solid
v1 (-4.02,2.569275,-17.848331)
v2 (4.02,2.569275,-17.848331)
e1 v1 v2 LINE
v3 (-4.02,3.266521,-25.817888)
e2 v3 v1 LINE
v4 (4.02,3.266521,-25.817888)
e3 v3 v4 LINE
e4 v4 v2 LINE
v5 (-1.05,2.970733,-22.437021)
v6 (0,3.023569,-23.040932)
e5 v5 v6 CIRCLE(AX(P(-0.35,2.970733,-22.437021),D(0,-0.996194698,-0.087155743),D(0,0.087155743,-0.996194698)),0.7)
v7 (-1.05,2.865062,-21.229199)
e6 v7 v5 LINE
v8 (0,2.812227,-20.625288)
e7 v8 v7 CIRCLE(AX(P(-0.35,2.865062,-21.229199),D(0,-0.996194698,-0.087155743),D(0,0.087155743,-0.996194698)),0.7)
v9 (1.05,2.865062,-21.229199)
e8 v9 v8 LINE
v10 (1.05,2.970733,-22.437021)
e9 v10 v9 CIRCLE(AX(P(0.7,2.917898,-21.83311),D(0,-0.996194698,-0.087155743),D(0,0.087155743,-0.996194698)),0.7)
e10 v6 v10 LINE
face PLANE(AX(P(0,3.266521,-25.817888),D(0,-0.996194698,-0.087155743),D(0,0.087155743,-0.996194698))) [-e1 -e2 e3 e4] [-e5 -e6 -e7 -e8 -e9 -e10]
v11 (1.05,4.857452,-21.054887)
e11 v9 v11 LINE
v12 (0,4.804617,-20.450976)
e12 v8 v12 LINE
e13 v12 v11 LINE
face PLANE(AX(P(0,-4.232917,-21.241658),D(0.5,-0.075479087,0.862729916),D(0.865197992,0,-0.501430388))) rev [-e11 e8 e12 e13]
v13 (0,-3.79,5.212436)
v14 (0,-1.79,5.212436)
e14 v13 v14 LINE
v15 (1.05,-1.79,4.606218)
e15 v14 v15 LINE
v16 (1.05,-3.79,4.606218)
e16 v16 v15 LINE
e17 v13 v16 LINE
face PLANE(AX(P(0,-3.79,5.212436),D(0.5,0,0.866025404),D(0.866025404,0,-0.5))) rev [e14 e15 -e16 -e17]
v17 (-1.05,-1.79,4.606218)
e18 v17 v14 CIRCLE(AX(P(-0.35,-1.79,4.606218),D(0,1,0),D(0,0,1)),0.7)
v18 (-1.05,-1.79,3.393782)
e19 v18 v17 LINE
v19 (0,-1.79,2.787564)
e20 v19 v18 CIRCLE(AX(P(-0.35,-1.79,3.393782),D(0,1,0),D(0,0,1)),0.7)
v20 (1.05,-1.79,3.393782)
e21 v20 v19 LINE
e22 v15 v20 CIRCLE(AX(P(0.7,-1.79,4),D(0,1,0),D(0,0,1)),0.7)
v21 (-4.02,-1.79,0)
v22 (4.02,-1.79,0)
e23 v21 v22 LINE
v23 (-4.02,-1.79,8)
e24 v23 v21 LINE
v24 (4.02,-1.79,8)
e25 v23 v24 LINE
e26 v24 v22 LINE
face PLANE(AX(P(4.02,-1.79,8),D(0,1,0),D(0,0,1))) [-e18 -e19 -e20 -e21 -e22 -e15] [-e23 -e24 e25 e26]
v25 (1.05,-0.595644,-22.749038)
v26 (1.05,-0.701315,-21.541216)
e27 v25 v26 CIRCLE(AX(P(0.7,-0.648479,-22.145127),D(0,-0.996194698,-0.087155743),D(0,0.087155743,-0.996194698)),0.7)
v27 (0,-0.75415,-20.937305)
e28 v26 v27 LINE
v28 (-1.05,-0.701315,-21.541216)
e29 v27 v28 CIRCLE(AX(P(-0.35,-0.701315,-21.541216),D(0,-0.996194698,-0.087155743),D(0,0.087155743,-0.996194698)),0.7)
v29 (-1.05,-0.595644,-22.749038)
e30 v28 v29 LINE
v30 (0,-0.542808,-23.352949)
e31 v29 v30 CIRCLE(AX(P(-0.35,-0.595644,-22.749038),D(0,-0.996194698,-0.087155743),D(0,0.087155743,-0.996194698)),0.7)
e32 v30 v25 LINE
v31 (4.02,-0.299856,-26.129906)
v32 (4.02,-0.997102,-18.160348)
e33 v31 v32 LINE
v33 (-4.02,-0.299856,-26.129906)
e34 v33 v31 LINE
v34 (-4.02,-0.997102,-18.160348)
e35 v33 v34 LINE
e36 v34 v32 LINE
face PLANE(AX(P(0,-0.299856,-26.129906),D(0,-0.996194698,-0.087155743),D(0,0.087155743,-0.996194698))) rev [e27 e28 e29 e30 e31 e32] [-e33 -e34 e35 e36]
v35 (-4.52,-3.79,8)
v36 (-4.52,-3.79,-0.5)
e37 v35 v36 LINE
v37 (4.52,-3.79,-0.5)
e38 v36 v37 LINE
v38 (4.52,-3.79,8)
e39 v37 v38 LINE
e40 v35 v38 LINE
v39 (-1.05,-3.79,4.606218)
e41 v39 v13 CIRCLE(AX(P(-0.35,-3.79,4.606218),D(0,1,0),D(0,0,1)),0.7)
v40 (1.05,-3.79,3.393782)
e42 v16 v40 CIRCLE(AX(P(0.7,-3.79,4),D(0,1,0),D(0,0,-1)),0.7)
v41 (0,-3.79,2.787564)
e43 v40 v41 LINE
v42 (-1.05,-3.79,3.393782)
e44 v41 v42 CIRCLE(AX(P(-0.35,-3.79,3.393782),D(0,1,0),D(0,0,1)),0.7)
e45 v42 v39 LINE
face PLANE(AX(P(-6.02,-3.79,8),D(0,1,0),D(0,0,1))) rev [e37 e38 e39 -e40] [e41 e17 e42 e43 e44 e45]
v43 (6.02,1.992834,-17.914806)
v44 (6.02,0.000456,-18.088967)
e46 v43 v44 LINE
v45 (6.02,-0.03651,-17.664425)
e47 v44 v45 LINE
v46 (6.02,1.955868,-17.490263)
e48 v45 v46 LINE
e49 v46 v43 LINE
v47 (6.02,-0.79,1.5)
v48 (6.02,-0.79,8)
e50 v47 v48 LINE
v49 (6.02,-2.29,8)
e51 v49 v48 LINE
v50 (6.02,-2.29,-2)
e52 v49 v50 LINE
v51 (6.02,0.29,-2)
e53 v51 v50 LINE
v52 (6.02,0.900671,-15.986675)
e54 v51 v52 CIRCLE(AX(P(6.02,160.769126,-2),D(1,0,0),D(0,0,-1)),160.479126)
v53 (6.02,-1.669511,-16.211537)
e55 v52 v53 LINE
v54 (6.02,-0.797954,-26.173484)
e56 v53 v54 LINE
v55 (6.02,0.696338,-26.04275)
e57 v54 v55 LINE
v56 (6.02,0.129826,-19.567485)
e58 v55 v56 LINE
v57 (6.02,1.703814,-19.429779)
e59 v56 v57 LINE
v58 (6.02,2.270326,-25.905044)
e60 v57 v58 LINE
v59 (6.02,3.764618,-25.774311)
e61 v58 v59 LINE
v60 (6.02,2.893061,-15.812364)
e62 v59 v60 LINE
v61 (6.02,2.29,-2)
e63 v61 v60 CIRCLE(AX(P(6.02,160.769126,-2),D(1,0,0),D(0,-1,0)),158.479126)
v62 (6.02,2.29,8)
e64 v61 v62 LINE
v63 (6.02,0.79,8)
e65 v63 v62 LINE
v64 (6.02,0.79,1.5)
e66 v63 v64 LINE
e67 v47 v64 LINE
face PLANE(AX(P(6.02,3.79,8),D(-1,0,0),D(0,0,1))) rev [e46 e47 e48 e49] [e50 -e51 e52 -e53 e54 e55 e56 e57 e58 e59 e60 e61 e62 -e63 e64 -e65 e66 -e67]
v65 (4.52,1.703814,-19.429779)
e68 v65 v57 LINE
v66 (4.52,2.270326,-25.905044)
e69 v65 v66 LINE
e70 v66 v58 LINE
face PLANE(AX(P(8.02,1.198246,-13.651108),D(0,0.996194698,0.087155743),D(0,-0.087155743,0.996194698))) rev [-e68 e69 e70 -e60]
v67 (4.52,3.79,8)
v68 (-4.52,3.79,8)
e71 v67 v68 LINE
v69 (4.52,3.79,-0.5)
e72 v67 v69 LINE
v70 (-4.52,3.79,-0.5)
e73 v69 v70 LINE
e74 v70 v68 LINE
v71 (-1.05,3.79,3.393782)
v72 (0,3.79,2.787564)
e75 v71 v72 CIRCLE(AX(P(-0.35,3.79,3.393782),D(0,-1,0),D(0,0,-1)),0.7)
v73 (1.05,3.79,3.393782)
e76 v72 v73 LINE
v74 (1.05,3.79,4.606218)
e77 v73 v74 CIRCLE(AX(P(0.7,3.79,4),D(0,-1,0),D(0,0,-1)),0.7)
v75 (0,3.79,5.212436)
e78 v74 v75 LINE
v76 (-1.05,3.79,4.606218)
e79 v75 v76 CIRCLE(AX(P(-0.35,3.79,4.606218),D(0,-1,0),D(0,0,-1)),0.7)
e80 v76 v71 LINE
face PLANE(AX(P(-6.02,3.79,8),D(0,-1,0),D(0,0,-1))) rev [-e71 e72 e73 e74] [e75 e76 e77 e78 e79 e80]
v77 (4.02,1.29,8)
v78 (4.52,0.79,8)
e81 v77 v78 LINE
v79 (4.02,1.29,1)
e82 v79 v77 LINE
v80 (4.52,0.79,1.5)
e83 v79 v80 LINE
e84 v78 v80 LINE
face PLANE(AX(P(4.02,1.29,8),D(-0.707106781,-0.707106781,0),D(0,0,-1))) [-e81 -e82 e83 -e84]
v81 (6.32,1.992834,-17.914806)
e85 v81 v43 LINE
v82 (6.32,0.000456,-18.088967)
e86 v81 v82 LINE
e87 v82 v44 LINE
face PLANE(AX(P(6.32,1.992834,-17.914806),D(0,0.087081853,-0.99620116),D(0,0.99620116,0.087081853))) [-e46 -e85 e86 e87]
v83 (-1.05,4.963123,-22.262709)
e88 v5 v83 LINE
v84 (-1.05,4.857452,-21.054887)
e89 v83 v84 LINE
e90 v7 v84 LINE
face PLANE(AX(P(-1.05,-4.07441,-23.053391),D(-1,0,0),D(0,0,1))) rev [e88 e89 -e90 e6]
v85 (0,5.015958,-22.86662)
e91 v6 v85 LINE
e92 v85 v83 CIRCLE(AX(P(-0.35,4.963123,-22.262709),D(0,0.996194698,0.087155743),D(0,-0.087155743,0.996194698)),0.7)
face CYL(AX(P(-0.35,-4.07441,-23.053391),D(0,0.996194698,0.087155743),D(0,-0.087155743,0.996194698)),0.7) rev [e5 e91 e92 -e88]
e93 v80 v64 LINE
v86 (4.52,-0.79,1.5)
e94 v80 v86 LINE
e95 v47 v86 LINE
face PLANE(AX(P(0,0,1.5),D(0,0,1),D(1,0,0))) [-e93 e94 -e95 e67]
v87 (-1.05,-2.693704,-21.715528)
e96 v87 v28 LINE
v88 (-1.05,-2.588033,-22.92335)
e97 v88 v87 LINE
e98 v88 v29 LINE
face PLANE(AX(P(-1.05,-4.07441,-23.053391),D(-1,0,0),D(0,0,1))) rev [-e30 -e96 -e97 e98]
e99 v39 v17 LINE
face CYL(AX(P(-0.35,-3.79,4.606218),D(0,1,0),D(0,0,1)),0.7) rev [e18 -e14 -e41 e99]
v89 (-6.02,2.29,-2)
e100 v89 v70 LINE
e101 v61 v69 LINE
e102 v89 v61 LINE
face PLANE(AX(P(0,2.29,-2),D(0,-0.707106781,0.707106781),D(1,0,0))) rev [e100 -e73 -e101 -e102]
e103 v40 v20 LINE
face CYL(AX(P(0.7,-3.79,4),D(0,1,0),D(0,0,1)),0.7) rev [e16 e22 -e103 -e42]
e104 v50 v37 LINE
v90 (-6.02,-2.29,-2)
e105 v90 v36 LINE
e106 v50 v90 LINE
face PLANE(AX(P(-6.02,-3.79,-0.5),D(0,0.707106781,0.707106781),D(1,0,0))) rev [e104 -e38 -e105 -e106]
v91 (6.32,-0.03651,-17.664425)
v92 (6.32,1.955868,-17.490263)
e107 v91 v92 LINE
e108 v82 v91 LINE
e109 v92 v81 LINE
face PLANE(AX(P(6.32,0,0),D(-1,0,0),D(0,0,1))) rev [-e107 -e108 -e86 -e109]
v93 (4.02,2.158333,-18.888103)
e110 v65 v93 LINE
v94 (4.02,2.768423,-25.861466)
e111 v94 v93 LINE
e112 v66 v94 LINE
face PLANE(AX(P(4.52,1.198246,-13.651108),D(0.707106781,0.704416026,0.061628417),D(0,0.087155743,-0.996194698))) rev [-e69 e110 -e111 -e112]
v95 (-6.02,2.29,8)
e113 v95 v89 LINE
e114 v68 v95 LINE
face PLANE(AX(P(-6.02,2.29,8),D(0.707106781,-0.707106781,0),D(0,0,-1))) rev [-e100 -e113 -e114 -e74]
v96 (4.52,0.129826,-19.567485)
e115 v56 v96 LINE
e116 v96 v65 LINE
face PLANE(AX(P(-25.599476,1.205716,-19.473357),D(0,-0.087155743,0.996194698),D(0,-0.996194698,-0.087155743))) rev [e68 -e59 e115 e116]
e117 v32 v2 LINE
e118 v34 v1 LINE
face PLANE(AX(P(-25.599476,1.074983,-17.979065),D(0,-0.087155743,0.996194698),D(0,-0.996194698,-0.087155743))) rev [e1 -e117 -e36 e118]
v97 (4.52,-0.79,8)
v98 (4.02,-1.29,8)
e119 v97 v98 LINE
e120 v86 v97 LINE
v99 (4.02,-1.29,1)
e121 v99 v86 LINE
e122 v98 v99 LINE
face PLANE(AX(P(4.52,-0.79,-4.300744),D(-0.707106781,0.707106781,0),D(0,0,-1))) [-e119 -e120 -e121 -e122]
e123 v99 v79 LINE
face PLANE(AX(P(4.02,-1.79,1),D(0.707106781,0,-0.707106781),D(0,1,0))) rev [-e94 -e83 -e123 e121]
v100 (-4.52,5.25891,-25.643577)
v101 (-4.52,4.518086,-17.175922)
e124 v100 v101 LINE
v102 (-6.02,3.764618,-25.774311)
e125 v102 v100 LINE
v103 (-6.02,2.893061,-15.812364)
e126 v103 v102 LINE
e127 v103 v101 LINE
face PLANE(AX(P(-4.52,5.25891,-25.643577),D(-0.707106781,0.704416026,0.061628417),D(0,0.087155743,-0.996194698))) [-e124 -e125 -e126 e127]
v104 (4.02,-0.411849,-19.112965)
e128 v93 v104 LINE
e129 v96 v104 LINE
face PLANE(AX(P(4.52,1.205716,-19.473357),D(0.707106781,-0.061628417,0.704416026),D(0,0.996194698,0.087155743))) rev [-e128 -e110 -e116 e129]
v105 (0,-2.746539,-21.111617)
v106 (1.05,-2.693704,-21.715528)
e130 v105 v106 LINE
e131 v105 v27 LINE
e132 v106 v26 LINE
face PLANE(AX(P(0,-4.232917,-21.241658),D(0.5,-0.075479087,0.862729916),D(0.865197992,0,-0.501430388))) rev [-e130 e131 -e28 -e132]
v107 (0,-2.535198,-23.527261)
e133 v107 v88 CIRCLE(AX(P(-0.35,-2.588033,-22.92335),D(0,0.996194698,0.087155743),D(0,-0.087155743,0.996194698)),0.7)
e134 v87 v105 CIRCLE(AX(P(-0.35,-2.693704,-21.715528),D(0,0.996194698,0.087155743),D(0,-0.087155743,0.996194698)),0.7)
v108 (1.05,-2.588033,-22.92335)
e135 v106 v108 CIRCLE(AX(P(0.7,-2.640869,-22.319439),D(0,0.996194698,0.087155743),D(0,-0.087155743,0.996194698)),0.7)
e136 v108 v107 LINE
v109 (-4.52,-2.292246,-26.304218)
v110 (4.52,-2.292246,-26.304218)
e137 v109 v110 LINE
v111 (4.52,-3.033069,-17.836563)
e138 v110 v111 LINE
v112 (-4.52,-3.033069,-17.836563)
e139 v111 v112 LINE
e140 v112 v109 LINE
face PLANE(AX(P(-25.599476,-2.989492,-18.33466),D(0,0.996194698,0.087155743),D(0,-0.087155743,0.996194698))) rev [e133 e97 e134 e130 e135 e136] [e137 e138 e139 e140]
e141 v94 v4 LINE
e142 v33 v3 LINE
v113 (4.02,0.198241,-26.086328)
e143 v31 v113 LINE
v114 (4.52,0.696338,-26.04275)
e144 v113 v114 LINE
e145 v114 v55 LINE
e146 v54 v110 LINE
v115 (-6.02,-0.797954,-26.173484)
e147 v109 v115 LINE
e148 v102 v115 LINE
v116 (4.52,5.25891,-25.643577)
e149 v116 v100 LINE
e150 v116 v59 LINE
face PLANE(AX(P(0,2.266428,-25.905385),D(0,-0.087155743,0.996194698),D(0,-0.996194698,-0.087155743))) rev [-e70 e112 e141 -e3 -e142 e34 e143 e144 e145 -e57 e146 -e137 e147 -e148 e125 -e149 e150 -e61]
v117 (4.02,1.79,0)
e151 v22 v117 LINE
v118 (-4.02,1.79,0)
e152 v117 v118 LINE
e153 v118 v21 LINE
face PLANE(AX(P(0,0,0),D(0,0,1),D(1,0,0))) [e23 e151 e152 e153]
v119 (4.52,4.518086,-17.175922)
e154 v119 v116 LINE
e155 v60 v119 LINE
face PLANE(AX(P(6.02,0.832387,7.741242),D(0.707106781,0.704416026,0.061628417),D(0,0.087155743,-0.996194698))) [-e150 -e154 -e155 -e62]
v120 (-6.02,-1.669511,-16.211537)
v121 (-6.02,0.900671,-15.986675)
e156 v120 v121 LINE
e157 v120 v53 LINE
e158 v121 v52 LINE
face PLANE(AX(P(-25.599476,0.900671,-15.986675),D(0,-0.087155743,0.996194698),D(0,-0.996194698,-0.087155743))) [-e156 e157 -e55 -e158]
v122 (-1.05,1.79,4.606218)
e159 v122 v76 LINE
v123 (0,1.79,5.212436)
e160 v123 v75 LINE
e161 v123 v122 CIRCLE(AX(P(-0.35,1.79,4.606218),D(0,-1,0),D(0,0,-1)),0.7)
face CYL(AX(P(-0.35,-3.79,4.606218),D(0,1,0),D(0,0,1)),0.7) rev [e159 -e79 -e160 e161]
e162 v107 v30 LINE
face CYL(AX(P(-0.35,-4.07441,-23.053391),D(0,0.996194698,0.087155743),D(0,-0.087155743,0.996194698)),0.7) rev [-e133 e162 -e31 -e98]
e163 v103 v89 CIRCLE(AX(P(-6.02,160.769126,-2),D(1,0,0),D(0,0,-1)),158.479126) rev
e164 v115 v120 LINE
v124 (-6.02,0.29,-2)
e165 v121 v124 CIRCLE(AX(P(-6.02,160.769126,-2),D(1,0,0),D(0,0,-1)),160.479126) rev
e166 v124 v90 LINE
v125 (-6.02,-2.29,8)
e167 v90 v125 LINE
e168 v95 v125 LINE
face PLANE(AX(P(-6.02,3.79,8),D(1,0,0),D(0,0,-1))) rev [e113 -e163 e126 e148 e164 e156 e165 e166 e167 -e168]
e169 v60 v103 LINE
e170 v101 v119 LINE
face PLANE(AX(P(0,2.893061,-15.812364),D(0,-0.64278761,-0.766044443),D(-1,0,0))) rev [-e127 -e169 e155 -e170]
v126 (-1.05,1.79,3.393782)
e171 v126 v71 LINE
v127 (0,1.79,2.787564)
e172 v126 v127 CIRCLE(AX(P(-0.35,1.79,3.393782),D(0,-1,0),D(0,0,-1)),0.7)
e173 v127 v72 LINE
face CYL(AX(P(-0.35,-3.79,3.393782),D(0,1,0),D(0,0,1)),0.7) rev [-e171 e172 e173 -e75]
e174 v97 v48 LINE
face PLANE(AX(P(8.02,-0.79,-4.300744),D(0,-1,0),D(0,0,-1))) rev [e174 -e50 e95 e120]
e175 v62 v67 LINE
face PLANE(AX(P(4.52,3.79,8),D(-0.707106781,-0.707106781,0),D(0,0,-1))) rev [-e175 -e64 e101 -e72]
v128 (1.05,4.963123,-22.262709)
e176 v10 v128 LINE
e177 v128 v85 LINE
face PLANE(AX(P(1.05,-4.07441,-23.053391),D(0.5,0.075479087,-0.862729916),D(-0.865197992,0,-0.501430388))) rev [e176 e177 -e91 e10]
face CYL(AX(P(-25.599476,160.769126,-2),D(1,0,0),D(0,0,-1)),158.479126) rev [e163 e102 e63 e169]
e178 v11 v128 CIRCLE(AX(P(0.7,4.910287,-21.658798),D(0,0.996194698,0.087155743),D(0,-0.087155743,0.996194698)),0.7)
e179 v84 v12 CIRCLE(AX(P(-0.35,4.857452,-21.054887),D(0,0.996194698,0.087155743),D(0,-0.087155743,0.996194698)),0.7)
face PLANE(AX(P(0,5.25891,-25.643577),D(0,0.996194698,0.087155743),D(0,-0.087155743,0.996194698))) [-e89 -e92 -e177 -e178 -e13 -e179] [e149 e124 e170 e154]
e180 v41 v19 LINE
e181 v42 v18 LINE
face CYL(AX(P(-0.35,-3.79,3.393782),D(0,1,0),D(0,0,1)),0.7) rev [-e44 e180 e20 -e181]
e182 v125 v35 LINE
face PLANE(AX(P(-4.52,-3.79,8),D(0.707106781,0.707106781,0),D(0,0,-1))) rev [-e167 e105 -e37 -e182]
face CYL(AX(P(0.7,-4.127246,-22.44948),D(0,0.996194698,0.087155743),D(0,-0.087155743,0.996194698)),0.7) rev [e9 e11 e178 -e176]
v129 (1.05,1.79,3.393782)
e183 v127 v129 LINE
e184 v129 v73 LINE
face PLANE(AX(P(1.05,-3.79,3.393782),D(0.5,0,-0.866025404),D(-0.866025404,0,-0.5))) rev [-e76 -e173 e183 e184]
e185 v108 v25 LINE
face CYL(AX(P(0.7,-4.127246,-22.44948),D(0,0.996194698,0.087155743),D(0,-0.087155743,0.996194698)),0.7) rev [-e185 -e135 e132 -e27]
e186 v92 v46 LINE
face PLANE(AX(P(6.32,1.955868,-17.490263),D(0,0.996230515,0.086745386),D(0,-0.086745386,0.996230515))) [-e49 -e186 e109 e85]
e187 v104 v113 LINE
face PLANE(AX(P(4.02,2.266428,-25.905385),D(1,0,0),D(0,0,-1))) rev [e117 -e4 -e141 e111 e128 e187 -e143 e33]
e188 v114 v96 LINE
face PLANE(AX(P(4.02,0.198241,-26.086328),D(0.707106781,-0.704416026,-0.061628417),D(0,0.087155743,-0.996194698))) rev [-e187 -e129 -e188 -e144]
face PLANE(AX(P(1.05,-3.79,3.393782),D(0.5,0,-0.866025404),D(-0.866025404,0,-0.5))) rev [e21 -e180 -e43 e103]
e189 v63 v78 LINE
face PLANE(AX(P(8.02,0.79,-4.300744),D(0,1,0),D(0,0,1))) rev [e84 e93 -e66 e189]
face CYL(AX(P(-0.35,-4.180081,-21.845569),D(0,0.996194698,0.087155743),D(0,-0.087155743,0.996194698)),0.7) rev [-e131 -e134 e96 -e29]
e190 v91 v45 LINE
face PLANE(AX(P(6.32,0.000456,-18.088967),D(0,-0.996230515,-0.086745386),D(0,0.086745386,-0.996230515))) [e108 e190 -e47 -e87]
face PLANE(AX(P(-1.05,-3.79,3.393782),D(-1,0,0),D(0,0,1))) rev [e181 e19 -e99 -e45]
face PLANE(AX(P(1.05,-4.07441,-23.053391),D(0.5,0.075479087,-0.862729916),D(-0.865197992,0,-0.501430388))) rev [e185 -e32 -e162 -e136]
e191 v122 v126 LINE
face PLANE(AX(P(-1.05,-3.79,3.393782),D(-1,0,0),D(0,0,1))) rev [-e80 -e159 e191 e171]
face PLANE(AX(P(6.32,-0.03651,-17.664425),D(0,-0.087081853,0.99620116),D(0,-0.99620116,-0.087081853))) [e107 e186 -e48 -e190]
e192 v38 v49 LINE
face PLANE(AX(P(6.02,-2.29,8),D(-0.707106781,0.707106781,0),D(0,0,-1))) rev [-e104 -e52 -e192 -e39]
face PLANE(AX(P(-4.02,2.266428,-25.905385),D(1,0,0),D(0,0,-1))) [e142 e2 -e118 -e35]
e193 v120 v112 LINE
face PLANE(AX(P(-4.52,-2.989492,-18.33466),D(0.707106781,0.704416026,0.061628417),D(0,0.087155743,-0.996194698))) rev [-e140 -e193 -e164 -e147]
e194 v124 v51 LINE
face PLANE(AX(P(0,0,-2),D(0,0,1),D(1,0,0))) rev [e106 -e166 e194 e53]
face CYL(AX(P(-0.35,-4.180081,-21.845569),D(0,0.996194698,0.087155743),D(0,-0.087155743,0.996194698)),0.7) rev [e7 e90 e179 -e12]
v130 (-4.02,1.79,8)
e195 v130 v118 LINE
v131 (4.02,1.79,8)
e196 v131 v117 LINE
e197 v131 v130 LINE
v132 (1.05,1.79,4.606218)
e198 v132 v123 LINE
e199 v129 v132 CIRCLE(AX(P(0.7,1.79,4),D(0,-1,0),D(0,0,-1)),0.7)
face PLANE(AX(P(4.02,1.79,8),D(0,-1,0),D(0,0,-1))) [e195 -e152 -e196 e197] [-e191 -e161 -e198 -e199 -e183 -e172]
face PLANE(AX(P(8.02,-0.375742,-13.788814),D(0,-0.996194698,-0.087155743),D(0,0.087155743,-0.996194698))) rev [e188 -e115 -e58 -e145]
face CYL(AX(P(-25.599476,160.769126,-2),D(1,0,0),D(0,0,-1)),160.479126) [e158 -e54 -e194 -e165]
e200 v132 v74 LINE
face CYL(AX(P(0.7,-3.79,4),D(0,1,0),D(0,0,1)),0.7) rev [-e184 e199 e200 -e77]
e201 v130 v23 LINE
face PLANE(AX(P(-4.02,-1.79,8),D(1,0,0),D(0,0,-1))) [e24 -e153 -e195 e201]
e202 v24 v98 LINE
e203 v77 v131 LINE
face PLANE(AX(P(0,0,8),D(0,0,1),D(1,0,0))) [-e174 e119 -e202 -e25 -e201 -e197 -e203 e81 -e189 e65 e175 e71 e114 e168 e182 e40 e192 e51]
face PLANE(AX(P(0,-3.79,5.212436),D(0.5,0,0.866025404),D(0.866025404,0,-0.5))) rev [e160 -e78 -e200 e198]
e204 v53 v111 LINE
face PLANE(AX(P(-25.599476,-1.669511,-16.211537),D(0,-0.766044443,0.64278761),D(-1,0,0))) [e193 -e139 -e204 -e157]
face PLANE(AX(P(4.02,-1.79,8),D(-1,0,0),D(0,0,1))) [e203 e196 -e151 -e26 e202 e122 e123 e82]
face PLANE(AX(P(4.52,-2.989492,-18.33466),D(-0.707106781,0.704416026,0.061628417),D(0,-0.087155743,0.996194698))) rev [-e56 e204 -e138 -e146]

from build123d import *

# Parameters (mm, degrees)
SKETCH1_W               = 12.04
SKETCH1_H               = 7.58
SKETCH1_W_2             = 8.04
SKETCH1_H_2             = 3.58
BOSS_EXTRUDE1_DEPTH     = 8
SKETCH1_2_W             = 12.04
SKETCH1_2_H             = 7.58
SKETCH1_2_W_2           = 8.04
SKETCH1_2_H_2           = 3.58
BOSS_EXTRUDE2_DEPTH     = 2
EXTRUDE_THIN1_START     = -12.04
EXTRUDE_THIN1_DEPTH     = 12.04
SKETCH5_W               = 12.04
SKETCH5_H               = 7.58
SKETCH5_W_2             = 8.04
SKETCH5_H_2             = 3.58
BOSS_EXTRUDE4_DEPTH     = 10
SKETCH5_4_W             = 12.04
SKETCH5_4_H             = 7.58
BOSS_EXTRUDE5_DEPTH     = 2
CHAMFER1_SIZE           = 1.5
CUT_EXTRUDE1_DEPTH      = 29.028711337
CUT_EXTRUDE1_DEPTH_BACK = 29.028711337
CUT_EXTRUDE2_DEPTH      = 29.071269996
CUT_EXTRUDE2_DEPTH_BACK = 29.071269996
SKETCH8_W               = 4
SKETCH8_H               = 1.58
CUT_EXTRUDE3_DEPTH      = 6.5
SKETCH9_W               = 4
SKETCH9_H               = 1.58
CUT_EXTRUDE4_DEPTH      = 6.5
CHAMFER2_SIZE           = 0.5
BOSS_EXTRUDE8_DEPTH     = 0.3


with BuildPart() as part:
    # Sketch1 → Boss-Extrude1 (new body)
    with BuildSketch(Plane.XY):
        Rectangle(SKETCH1_W, SKETCH1_H)
        Rectangle(SKETCH1_W_2, SKETCH1_H_2, mode=Mode.SUBTRACT)
    extrude(amount=BOSS_EXTRUDE1_DEPTH)

    # Sketch1<2> → Boss-Extrude2 (add)
    # profile 1 of 2: a face of its own
    with BuildSketch(Plane.XY):
        Rectangle(SKETCH1_2_W, SKETCH1_2_H)
        Rectangle(SKETCH1_2_W_2, SKETCH1_2_H_2, mode=Mode.SUBTRACT)
    # profile 2 of 2: a face of its own
    with BuildSketch(Plane.XY):
        Rectangle(SKETCH1_2_W_2, SKETCH1_2_H_2)
    extrude(amount=-BOSS_EXTRUDE2_DEPTH)

    # Sketch3 → Extrude-Thin1 (add)
    with BuildSketch(Plane(origin=(6.02, 9.81, 0), x_dir=(0, -1, 0), z_dir=(1, 0, 0)).offset(EXTRUDE_THIN1_START)):
        with BuildLine():
            Line((13.6, 2), (9.52, 2))
            ThreePointArc((9.52, 2), (9.367259482, 9), (8.909328677, 15.986675107))
            Line((8.909328677, 15.986675107), (12.973803045, 16.342270537))
            Line((12.973803045, 16.342270537), (12.799491559, 18.334659933))
            Line((12.799491559, 18.334659933), (6.730055387, 17.803653074))
            ThreePointArc((6.730055387, 17.803653074), (7.369163038, 8.912761225), (7.507379539, 0))
            Line((7.507379539, 0), (13.6, 0))
            Line((13.6, 0), (13.6, 2))
        make_face()
    extrude(amount=EXTRUDE_THIN1_DEPTH)

    # Sketch5 → Boss-Extrude4 (add)
    with BuildSketch(Plane(origin=(0, -2.356055999, -16.271601827), x_dir=(-1, 0, 0), z_dir=(0, 0.08715574274765182, -0.9961946980917462))):
        with Locations((0, 2.979167492)):
            Rectangle(SKETCH5_W, SKETCH5_H)
        with Locations((0, 2.979167492)):
            Rectangle(SKETCH5_W_2, SKETCH5_H_2, mode=Mode.SUBTRACT)
    extrude(amount=BOSS_EXTRUDE4_DEPTH)

    # Sketch5<4> → Boss-Extrude5 (add)
    with BuildSketch(Plane(origin=(0, -2.356055999, -16.271601827), x_dir=(-1, 0, 0), z_dir=(0, 0.08715574274765182, -0.9961946980917462))):
        with Locations((0, 2.979167492)):
            Rectangle(SKETCH5_4_W, SKETCH5_4_H)
    extrude(amount=BOSS_EXTRUDE5_DEPTH)

    # Chamfer1
    chamfer1_edges = [part.edges().sort_by_distance(p)[0] for p in [
        (0, -3.79, -2),
        (0, 3.79, -2),
        (-6.02, -2.728024331, -21.323244027),
        (6.02, -2.728024331, -21.323244027),
        (0, -3.163803045, -16.342270537),
        (6.02, -3.79, 3),
        (-6.02, -3.79, 3),
        (-6.02, 3.79, 3),
        (6.02, 3.79, 3),
        (0, 4.387352767, -15.681630007),
        (6.02, 4.82313148, -20.662603497),
        (-6.02, 4.82313148, -20.662603497),
    ]]
    chamfer(chamfer1_edges, length=CHAMFER1_SIZE - 0.0001)  # a hair under: the kernel refuses the full size

    # Sketch6 → Cut-Extrude1 (cut, two sides: drawn at the far end of the back side and taken through both)
    with BuildSketch(Plane(origin=(0, 3.79, 0), x_dir=(1, 0, 0), z_dir=(0, 1, 0)).offset(-CUT_EXTRUDE1_DEPTH_BACK)):
        with BuildLine():
            Line((1.05, -3.393782217), (0, -2.787564435))
            ThreePointArc((0, -2.787564435), (-0.7, -2.787564435), (-1.05, -3.393782217))
            Line((-1.05, -3.393782217), (-1.05, -4.606217783))
            ThreePointArc((-1.05, -4.606217783), (-0.7, -5.212435565), (0, -5.212435565))
            Line((0, -5.212435565), (1.05, -4.606217783))
            ThreePointArc((1.05, -4.606217783), (1.4, -4), (1.05, -3.393782217))
        make_face()
    extrude(amount=CUT_EXTRUDE1_DEPTH + CUT_EXTRUDE1_DEPTH_BACK, mode=Mode.SUBTRACT)

    # Sketch7 → Cut-Extrude2 (cut, two sides: drawn at the far end of the back side and taken through both)
    with BuildSketch(Plane(origin=(0, 2.992482656, 0.261808308), x_dir=(1, 0, 0), z_dir=(0, 0.9961946980917462, 0.08715574274765181)).offset(-CUT_EXTRUDE2_DEPTH_BACK)):
        with BuildLine():
            Line((1.05, 22.610557442), (0, 23.216775225))
            ThreePointArc((0, 23.216775225), (-0.7, 23.216775225), (-1.05, 22.610557442))
            Line((-1.05, 22.610557442), (-1.05, 21.398121877))
            ThreePointArc((-1.05, 21.398121877), (-0.7, 20.791904094), (0, 20.791904094))
            Line((0, 20.791904094), (1.05, 21.398121877))
            ThreePointArc((1.05, 21.398121877), (1.4, 22.004339659), (1.05, 22.610557442))
        make_face()
    extrude(amount=CUT_EXTRUDE2_DEPTH + CUT_EXTRUDE2_DEPTH_BACK, mode=Mode.SUBTRACT)

    # Sketch8 → Cut-Extrude3 (cut)
    with BuildSketch(Plane(origin=(0, 2.266427538, -25.905385296), x_dir=(-1, 0, 0), z_dir=(0, 0.08715574274765193, -0.9961946980917461))):
        with Locations((-6.02, -0.786086546)):
            Rectangle(SKETCH8_W, SKETCH8_H)
    extrude(amount=-CUT_EXTRUDE3_DEPTH, mode=Mode.SUBTRACT)

    # Sketch9 → Cut-Extrude4 (cut)
    with BuildSketch(Plane.XY.offset(8)):
        with Locations((6.02, 0)):
            Rectangle(SKETCH9_W, SKETCH9_H)
    extrude(amount=-CUT_EXTRUDE4_DEPTH, mode=Mode.SUBTRACT)

    # Chamfer2
    chamfer2_edges = [part.edges().sort_by_distance(p)[0] for p in [
        (4.02, 0.413082313, -22.805117521),
        (4.02, 0.91681996, -19.498631715),
        (4.02, 1.987069936, -22.667411447),
        (4.02, 0.79, 4.75),
        (4.02, 0, 1.5),
        (4.02, -0.79, 4.75),
    ]]
    chamfer(chamfer2_edges, length=CHAMFER2_SIZE)

    # Sketch12 → Boss-Extrude8 (add)
    with BuildSketch(Plane(origin=(6.02, 0, 0), x_dir=(0, 0, -1), z_dir=(1, 0, 0))):
        Polygon((17.914805855, 1.992834285), (18.088967441, 0.000456236), (17.664424758, -0.036510227), (17.490263173, 1.955867821), align=None)
    extrude(amount=BOSS_EXTRUDE8_DEPTH)


solid = part.part
